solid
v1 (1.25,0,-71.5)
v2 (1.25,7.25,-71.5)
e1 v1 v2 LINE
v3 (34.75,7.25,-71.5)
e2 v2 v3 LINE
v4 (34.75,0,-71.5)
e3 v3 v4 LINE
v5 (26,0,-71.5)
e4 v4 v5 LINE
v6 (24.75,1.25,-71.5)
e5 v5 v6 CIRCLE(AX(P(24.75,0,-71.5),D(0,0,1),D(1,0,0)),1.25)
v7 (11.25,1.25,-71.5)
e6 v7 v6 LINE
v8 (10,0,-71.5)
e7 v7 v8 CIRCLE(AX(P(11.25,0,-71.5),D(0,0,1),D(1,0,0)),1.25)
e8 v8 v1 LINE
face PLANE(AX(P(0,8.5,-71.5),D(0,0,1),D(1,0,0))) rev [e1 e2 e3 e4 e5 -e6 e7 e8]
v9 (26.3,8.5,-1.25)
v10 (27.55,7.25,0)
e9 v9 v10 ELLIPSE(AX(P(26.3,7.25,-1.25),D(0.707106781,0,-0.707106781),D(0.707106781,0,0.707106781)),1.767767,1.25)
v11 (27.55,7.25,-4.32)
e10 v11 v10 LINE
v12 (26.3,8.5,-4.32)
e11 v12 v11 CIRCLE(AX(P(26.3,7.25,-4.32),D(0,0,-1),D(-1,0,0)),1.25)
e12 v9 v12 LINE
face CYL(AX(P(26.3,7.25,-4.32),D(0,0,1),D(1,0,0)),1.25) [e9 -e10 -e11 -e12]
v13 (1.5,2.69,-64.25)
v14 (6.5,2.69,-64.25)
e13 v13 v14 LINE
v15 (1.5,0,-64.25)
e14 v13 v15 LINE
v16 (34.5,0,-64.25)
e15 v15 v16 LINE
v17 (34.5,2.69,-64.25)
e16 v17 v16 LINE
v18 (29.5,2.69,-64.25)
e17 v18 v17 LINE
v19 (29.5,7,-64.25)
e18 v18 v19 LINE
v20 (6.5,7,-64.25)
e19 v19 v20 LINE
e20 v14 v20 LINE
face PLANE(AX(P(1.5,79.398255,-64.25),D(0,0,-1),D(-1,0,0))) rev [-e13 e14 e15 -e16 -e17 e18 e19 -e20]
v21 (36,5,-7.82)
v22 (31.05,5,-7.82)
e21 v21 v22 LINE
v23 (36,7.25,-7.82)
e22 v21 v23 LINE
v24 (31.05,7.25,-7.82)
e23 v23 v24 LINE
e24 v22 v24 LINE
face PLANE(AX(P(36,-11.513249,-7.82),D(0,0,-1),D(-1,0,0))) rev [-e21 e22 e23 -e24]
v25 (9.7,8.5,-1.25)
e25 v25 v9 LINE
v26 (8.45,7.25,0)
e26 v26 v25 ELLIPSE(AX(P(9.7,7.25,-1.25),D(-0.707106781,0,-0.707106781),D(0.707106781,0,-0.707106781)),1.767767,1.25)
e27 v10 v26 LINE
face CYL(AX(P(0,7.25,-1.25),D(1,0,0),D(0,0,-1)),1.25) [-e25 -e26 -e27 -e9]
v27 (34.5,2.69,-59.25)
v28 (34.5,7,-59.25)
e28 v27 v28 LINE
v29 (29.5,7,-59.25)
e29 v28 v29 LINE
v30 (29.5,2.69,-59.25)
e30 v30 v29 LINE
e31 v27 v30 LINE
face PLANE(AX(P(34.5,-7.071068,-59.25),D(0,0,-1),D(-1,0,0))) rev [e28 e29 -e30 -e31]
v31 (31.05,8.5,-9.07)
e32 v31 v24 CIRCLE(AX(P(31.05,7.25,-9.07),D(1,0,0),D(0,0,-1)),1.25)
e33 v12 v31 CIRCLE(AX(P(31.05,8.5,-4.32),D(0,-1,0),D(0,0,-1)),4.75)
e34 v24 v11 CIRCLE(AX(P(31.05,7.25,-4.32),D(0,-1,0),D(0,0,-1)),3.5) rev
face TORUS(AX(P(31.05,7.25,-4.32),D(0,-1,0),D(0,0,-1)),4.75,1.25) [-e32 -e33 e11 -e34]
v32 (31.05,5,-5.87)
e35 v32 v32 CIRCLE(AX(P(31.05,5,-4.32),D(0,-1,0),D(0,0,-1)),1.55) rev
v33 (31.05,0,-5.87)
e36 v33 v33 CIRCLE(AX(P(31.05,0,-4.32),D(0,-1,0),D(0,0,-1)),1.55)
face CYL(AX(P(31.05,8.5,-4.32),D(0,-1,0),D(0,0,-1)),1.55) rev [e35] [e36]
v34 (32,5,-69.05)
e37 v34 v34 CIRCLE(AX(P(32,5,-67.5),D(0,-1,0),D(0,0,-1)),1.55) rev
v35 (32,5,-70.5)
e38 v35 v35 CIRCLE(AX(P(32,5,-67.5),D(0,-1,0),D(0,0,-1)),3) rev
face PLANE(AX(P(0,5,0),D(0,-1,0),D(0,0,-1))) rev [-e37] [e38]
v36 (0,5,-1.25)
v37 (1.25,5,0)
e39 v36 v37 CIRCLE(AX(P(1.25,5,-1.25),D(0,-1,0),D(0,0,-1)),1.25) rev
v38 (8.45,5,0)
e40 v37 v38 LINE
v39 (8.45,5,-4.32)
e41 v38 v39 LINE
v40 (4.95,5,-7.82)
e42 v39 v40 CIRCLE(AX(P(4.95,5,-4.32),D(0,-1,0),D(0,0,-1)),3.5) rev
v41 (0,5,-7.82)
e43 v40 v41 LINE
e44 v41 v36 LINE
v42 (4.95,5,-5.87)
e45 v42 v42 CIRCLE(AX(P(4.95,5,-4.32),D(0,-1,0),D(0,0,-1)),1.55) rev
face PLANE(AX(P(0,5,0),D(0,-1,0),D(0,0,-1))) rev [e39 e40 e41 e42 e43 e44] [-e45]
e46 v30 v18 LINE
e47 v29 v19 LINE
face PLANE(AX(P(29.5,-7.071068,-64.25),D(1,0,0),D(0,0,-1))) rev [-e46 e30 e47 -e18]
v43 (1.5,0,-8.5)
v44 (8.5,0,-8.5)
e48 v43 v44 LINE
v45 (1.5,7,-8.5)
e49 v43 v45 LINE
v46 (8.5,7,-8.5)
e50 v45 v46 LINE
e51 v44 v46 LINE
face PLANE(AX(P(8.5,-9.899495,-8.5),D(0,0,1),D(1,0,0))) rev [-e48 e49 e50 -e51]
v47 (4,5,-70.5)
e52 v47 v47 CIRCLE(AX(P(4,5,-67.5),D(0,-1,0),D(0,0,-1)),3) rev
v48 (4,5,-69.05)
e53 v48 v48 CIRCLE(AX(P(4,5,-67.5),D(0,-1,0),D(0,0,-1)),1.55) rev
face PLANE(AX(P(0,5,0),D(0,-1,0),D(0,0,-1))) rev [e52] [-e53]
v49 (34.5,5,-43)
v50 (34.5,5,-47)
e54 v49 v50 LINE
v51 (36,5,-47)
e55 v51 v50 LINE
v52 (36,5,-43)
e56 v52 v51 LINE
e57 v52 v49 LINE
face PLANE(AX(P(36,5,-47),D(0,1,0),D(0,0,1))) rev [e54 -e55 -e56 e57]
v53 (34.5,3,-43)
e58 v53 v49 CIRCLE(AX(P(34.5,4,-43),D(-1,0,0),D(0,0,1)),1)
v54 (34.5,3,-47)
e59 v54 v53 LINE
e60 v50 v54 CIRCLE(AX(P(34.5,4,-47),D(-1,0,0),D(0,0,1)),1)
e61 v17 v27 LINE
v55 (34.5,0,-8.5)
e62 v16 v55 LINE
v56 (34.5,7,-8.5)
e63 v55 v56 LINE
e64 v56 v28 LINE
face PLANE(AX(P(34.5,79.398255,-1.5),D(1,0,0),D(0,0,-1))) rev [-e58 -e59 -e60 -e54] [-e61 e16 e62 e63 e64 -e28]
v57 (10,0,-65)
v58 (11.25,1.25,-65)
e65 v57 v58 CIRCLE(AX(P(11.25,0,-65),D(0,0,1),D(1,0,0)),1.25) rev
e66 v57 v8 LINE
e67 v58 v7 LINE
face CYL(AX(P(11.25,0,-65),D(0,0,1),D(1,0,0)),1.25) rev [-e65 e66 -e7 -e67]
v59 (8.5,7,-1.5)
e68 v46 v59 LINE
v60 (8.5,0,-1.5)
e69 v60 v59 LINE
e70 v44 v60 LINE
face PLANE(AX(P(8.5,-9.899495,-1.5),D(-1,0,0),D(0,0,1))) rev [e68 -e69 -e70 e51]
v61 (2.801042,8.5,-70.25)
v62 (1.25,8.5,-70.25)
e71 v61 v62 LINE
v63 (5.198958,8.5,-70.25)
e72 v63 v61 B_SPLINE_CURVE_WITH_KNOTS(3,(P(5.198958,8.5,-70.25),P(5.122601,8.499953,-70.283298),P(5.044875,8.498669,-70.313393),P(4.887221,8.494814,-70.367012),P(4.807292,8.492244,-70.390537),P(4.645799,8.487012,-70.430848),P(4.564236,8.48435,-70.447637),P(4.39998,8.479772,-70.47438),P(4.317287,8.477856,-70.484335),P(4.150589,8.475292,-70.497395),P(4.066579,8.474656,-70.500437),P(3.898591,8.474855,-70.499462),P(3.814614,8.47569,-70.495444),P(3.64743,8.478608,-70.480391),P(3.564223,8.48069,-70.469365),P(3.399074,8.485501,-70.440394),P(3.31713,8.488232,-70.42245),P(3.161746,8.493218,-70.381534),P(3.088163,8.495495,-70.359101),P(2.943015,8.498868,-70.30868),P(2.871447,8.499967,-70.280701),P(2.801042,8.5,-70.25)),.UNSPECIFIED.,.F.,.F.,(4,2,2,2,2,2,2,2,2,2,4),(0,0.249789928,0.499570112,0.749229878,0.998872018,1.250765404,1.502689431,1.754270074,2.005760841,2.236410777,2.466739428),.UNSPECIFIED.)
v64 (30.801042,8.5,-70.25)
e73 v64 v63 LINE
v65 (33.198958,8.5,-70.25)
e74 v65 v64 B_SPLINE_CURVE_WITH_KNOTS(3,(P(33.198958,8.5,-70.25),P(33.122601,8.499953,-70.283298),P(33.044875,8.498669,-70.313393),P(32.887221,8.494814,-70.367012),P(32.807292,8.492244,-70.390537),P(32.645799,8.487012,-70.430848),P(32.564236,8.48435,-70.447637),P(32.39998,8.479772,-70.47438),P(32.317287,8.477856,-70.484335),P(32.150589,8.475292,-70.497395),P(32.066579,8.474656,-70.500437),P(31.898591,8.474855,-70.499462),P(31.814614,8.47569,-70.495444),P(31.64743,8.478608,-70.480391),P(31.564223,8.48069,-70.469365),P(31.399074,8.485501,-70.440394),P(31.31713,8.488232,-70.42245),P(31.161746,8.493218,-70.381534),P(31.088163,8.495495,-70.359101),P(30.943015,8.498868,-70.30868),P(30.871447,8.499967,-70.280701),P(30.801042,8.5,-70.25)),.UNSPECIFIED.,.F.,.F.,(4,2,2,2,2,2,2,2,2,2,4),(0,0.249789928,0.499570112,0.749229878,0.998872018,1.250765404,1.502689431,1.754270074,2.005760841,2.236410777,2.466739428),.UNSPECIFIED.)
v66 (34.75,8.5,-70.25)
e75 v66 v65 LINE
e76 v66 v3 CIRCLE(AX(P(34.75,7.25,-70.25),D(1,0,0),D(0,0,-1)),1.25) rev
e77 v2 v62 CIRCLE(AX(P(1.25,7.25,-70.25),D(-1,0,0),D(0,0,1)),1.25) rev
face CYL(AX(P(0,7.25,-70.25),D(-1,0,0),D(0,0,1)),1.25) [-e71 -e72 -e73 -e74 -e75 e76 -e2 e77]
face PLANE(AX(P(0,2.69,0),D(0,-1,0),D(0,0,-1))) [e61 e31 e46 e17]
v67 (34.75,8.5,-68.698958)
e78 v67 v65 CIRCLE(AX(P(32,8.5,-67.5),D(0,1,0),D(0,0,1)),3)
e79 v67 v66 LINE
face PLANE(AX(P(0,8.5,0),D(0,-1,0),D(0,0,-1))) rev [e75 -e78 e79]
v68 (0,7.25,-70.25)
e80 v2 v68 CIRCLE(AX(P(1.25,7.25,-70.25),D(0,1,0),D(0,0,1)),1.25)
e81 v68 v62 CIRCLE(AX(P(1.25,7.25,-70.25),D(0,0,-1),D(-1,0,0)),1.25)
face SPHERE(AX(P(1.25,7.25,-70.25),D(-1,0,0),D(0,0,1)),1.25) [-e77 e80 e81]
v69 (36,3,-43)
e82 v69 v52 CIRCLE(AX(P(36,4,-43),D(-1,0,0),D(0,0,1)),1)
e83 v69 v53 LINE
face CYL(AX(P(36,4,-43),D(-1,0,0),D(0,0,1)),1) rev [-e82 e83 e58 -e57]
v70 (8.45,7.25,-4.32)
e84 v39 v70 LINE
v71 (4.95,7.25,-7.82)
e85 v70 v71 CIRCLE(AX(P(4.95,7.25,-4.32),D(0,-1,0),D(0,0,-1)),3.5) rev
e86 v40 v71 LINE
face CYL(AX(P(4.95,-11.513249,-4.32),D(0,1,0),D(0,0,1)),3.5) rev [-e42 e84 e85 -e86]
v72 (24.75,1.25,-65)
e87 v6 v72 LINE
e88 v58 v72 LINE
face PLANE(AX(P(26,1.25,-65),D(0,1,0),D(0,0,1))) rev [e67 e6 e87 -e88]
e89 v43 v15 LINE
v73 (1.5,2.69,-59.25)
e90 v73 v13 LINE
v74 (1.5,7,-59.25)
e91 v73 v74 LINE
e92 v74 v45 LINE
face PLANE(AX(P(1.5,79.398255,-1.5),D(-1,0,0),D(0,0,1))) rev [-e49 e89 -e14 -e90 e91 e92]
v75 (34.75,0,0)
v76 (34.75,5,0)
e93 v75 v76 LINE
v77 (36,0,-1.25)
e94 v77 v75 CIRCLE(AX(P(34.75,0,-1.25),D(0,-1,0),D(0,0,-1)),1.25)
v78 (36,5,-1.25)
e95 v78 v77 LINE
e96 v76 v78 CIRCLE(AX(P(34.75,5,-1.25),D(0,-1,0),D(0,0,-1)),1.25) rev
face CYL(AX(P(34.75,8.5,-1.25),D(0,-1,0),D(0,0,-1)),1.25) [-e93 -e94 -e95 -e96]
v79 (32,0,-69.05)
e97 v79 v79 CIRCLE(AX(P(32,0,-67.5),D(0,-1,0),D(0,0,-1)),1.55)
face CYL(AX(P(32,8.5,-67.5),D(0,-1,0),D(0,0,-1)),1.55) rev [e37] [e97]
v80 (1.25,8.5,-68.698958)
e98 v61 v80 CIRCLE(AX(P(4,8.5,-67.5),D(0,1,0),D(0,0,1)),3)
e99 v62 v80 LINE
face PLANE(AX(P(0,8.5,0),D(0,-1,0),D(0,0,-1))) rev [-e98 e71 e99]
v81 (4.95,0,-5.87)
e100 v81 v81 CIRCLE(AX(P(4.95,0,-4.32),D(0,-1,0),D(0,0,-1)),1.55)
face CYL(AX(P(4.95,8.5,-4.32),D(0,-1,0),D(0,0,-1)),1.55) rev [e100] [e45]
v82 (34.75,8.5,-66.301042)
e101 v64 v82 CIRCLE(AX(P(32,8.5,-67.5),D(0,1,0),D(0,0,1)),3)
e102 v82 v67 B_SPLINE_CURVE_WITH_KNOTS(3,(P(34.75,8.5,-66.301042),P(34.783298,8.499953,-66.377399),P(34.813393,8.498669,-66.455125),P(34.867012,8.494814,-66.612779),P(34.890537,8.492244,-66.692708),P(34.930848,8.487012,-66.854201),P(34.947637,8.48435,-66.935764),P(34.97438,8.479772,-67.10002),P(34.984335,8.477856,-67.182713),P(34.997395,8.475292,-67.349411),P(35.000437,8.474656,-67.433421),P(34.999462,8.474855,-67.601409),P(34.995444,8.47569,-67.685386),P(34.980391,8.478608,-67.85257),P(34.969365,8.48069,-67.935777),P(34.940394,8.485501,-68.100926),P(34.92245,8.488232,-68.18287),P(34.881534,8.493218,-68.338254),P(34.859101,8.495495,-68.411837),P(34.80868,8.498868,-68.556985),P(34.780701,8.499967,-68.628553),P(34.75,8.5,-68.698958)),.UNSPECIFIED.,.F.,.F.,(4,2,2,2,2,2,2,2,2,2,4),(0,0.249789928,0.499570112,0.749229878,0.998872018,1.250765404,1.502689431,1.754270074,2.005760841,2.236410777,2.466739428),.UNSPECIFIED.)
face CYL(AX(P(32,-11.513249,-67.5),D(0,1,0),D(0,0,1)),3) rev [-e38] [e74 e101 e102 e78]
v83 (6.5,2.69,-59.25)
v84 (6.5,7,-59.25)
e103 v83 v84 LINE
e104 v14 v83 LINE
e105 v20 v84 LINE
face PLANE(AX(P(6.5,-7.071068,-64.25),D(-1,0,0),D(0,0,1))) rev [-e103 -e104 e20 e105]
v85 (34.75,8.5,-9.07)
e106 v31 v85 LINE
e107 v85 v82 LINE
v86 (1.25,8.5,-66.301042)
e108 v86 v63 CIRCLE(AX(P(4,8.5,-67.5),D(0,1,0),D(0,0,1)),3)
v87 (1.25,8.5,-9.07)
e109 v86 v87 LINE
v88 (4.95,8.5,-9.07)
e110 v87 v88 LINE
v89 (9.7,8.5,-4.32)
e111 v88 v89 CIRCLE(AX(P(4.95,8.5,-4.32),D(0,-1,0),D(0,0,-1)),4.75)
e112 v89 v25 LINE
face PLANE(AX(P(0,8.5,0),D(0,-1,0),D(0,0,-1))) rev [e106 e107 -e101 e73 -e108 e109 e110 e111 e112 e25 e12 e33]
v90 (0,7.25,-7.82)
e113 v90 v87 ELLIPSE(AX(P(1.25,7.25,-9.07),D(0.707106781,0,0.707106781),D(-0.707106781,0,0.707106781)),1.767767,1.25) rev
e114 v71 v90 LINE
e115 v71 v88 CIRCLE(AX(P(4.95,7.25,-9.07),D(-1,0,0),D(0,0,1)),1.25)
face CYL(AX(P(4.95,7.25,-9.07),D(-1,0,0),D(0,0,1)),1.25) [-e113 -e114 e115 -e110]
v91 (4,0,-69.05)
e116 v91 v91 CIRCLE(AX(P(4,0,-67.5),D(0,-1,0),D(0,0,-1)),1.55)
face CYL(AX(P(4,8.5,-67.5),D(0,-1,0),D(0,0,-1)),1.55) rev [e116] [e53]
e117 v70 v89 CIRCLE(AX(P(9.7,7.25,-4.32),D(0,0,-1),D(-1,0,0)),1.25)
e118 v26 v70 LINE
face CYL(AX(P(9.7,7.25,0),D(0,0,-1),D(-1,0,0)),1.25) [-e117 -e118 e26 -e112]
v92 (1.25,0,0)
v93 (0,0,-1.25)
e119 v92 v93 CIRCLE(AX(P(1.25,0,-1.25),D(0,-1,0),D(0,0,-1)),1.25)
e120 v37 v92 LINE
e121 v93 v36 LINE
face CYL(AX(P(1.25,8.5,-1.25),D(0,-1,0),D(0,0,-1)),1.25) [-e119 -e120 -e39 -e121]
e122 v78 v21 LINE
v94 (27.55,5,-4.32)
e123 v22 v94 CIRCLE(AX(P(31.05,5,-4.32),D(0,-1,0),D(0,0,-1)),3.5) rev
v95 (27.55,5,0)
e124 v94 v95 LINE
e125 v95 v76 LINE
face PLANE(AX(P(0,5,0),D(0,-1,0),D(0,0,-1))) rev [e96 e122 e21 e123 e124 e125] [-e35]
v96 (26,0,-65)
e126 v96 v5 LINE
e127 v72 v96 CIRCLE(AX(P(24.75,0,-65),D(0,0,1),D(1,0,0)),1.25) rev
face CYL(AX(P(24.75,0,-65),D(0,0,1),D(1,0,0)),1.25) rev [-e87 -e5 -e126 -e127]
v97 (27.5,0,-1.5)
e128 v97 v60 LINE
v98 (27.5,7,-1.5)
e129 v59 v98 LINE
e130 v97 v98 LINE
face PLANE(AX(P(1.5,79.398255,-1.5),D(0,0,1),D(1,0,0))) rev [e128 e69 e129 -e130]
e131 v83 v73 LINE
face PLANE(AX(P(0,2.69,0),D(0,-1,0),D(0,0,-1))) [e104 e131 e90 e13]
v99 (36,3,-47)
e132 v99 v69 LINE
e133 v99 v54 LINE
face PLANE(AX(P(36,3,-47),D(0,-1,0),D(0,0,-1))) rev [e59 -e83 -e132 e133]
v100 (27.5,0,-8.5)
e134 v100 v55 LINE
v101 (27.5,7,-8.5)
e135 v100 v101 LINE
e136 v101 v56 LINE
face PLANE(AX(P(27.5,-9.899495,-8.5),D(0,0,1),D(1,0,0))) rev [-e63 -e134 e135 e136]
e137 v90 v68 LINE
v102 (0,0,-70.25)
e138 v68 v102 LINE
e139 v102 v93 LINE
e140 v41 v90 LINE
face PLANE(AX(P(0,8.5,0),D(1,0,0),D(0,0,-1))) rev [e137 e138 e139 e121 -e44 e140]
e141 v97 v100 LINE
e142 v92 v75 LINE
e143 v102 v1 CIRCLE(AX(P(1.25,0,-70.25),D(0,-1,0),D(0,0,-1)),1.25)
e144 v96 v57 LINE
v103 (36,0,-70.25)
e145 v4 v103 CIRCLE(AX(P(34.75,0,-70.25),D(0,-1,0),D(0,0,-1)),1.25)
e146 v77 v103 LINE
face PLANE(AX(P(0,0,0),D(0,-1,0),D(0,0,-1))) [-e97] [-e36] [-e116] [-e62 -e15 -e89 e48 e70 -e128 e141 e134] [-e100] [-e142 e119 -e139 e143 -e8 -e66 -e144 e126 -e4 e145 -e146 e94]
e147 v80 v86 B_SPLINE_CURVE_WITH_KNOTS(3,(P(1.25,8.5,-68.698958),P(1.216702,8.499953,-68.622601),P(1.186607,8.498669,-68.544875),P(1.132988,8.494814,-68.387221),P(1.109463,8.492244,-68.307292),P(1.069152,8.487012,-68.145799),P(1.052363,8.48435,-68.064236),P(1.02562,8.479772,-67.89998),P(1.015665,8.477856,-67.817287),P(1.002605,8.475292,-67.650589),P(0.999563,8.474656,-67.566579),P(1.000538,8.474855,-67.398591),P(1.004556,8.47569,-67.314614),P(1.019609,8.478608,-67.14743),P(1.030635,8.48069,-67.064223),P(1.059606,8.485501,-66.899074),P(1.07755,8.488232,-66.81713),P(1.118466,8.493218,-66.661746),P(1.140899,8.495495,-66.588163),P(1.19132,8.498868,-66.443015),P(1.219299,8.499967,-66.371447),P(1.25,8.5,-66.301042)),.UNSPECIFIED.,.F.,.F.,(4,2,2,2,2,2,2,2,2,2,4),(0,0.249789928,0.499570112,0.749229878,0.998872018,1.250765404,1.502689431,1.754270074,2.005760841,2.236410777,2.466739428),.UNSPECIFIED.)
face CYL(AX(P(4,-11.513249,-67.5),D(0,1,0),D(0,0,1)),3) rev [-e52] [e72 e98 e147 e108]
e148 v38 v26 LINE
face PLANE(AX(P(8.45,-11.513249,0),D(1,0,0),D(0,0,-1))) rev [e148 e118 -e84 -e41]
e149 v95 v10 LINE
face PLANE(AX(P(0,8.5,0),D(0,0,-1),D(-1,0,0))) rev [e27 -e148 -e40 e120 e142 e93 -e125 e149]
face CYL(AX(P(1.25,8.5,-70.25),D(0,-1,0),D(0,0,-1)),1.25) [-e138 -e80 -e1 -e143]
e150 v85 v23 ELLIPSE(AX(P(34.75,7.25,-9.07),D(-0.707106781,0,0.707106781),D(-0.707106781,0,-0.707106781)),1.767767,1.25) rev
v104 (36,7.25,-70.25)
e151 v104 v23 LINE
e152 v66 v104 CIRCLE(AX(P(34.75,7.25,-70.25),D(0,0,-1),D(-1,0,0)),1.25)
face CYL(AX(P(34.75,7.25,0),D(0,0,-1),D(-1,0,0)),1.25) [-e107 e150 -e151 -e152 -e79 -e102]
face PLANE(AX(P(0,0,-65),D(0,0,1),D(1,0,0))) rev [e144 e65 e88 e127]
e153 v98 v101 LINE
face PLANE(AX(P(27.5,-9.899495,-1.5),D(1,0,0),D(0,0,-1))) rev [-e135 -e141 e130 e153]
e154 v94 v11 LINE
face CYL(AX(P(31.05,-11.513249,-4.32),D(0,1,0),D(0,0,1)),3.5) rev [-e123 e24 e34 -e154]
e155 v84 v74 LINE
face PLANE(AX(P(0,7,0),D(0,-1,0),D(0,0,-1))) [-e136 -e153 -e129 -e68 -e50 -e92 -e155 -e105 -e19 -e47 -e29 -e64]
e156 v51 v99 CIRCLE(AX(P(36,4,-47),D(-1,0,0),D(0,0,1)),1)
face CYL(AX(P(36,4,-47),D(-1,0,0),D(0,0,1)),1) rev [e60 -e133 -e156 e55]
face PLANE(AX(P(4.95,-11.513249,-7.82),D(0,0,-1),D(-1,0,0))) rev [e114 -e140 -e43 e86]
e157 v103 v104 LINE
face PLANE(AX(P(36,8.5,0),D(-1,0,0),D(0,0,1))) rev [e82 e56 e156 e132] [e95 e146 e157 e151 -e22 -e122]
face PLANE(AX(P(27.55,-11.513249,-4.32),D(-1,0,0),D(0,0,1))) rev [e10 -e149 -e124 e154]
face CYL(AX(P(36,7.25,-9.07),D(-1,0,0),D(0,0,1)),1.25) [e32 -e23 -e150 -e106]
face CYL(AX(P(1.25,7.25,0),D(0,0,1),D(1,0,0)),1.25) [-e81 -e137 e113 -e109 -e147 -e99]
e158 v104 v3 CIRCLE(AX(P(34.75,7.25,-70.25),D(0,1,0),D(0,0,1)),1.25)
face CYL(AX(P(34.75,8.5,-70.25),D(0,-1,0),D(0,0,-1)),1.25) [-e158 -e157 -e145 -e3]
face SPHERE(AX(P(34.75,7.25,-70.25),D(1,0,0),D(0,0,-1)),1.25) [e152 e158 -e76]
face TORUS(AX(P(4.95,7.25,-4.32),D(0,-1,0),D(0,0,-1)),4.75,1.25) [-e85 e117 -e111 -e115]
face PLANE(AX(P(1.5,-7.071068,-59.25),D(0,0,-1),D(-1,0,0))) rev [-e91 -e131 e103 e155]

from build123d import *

# Parameters (mm, degrees)
SKETCH1_W           = 36
SKETCH1_H           = 71.5
BOSS_EXTRUDE1_DEPTH = 8.5
SKETCH2_W           = 33
SKETCH2_H           = 62.75
CUT_EXTRUDE1_DEPTH  = 7
SKETCH4_W           = 16
SKETCH4_H           = 1.25
CUT_EXTRUDE2_DEPTH  = 6.5
FILLET1_R           = 1.25
SKETCH7_W           = 7
SKETCH7_H           = 7
BOSS_EXTRUDE4_DEPTH = 7
SKETCH8_R           = 1.55
CUT_EXTRUDE3_DEPTH  = 81.50155278
SKETCH9_R           = 3
CUT_EXTRUDE4_DEPTH  = 3.5
CUT_EXTRUDE5_DEPTH  = 80.842031537
SKETCH11_W          = 5
SKETCH11_H          = 5
BOSS_EXTRUDE8_DEPTH = 4.31
FILLET2_R           = 1.25


# Some blends are built 0.0001 mm under size
with BuildPart() as part:
    # Sketch1 → Boss-Extrude1 (new body)
    with BuildSketch(Plane(origin=(0, 0, 0), x_dir=(1, 0, 0), z_dir=(0, 1, 0))):
        with Locations((18, 35.75)):
            Rectangle(SKETCH1_W, SKETCH1_H)
    extrude(amount=BOSS_EXTRUDE1_DEPTH)

    # Sketch2 → Cut-Extrude1 (cut)
    with BuildSketch(Plane.XZ):
        with Locations((18, -32.875)):
            Rectangle(SKETCH2_W, SKETCH2_H)
    extrude(amount=-CUT_EXTRUDE1_DEPTH, mode=Mode.SUBTRACT)

    # Sketch4 → Cut-Extrude2 (cut)
    with BuildSketch(Plane(origin=(0, 0, -71.5), x_dir=(-1, 0, 0), z_dir=(0, 0, -1))):
        with Locations((-18, 0.625)):
            Rectangle(SKETCH4_W, SKETCH4_H)
    extrude(amount=-CUT_EXTRUDE2_DEPTH, mode=Mode.SUBTRACT)

    # Fillet1
    fillet1_edges = [part.edges().sort_by_distance(p)[0] for p in [
        (26, 1.25, -68.25),
        (10, 1.25, -68.25),
    ]]
    fillet(fillet1_edges, radius=FILLET1_R - 0.0001)  # a hair under: the kernel refuses the full size

    # Sketch7 → Boss-Extrude4 (add)
    with BuildSketch(Plane.XZ.offset(-7)):
        with Locations((31, -5)):
            Rectangle(SKETCH7_W, SKETCH7_H)
        with Locations((5, -5)):
            Rectangle(SKETCH7_W, SKETCH7_H)
    extrude(amount=BOSS_EXTRUDE4_DEPTH)

    # Sketch8 → Cut-Extrude3 (cut, through all)
    with BuildSketch(Plane(origin=(0, 0, 0), x_dir=(-1, 0, 0), z_dir=(0, -1, 0))):
        with Locations(Location((-31.05, 4.32, 0), (0, 0, 90))):
            Circle(SKETCH8_R)
        with Locations(Location((-32, 67.5, 0), (0, 0, 90))):
            Circle(SKETCH8_R)
        with Locations(Location((-4, 67.5, 0), (0, 0, 90))):
            Circle(SKETCH8_R)
        with Locations(Location((-4.95, 4.32, 0), (0, 0, 90))):
            Circle(SKETCH8_R)
    extrude(amount=-CUT_EXTRUDE3_DEPTH, mode=Mode.SUBTRACT)

    # Sketch9 → Cut-Extrude4 (cut)
    with BuildSketch(Plane(origin=(0, 8.5, 0), x_dir=(1, 0, 0), z_dir=(0, 1, 0))):
        with Locations(Location((4, 67.5, 0), (0, 0, 270))):
            Circle(SKETCH9_R)
        with Locations(Location((32, 67.5, 0), (0, 0, 270))):
            Circle(SKETCH9_R)
        with BuildLine():
            Line((4.95, 7.82), (0, 7.82))
            Line((0, 7.82), (0, 0))
            Line((0, 0), (8.45, 0))
            Line((8.45, 0), (8.45, 4.32))
            ThreePointArc((8.45, 4.32), (7.424873734, 6.794873734), (4.95, 7.82))
        make_face()
        with BuildLine():
            Line((27.55, 4.32), (27.55, 0))
            Line((27.55, 0), (36, 0))
            Line((36, 0), (36, 7.82))
            Line((36, 7.82), (31.05, 7.82))
            ThreePointArc((31.05, 7.82), (28.575126266, 6.794873734), (27.55, 4.32))
        make_face()
    extrude(amount=-CUT_EXTRUDE4_DEPTH, mode=Mode.SUBTRACT)

    # Sketch10 → Cut-Extrude5 (cut, through all)
    with BuildSketch(Plane.ZY.offset(-34.5)):
        with BuildLine():
            Line((-47, 5), (-43, 5))
            ThreePointArc((-43, 5), (-42, 4), (-43, 3))
            Line((-43, 3), (-47, 3))
            ThreePointArc((-47, 3), (-48, 4), (-47, 5))
        make_face()
    extrude(amount=-CUT_EXTRUDE5_DEPTH, mode=Mode.SUBTRACT)

    # Sketch11 → Boss-Extrude8 (add)
    with BuildSketch(Plane.XZ.offset(-7)):
        with Locations((4, -61.75)):
            Rectangle(SKETCH11_W, SKETCH11_H)
        with Locations((32, -61.75)):
            Rectangle(SKETCH11_W, SKETCH11_H)
    extrude(amount=BOSS_EXTRUDE8_DEPTH)

    # Fillet2
    # the kernel refuses this fillet: 1.25 mm, written as the material it takes off along each edge
    with BuildSketch(Plane(origin=(34.75, 7.25, -70.25), x_dir=(1, 0, 0), z_dir=(0, 0, -1))) as fillet2_piece_1_section:
        Polygon((0, 0), (FILLET2_R, 0), (FILLET2_R, -FILLET2_R), (0, -FILLET2_R), align=None)
    fillet2_piece_1 = extrude(amount=FILLET2_R, mode=Mode.PRIVATE)
    fillet2_piece_1 = fillet2_piece_1 - Plane(origin=(34.75, 7.25, -70.25), x_dir=(-0.7071067811865475, -0.7071067811865475, 0), z_dir=(0, 0, -1)) * Sphere(FILLET2_R, mode=Mode.PRIVATE)
    add(fillet2_piece_1, mode=Mode.SUBTRACT)
    with BuildSketch(Plane(origin=(1.25, 7.25, -70.25), x_dir=(-1, 0, 0), z_dir=(0, 0, -1))) as fillet2_piece_2_section:
        Polygon((0, 0), (FILLET2_R, 0), (FILLET2_R, FILLET2_R), (0, FILLET2_R), align=None)
    fillet2_piece_2 = extrude(amount=FILLET2_R, mode=Mode.PRIVATE)
    fillet2_piece_2 = fillet2_piece_2 - Plane(origin=(1.25, 7.25, -70.25), x_dir=(0.7071067811865475, -0.7071067811865475, 0), z_dir=(0, 0, -1)) * Sphere(FILLET2_R, mode=Mode.PRIVATE)
    add(fillet2_piece_2, mode=Mode.SUBTRACT)
    with BuildSketch(Plane(origin=(5.325, 8.5, 0), x_dir=(0, 0, -1), z_dir=(1, 0, 0))) as fillet2_piece_3:
        with BuildLine():
            CenterArc((FILLET2_R, -FILLET2_R), FILLET2_R, 90, 90)
            Line((0, -FILLET2_R), (0, 0))
            Line((0, 0), (FILLET2_R, 0))
        make_face()
    extrude(amount=25.35, mode=Mode.SUBTRACT)
    with BuildSketch(Plane(origin=(36, 8.5, -4.695), x_dir=(0, -1, 0), z_dir=(0, 0, -1))) as fillet2_piece_4:
        with BuildLine():
            CenterArc((FILLET2_R, FILLET2_R), FILLET2_R, 180, 90)
            Line((0, FILLET2_R), (0, 0))
            Line((0, 0), (FILLET2_R, 0))
        make_face()
    extrude(amount=65.555, mode=Mode.SUBTRACT)
    with BuildSketch(Plane(origin=(36, -3.125, 0), x_dir=(0, 0, -1), z_dir=(0, 1, 0))) as fillet2_piece_5:
        with BuildLine():
            CenterArc((FILLET2_R, FILLET2_R), FILLET2_R, 180, 90)
            Line((0, FILLET2_R), (0, 0))
            Line((0, 0), (FILLET2_R, 0))
        make_face()
    extrude(amount=11.25, mode=Mode.SUBTRACT)
    with BuildSketch(Plane(origin=(0, -3.125, 0), x_dir=(0, 0, -1), z_dir=(0, 1, 0))) as fillet2_piece_6:
        with BuildLine():
            CenterArc((FILLET2_R, -FILLET2_R), FILLET2_R, 90, 90)
            Line((0, -FILLET2_R), (0, 0))
            Line((0, 0), (FILLET2_R, 0))
        make_face()
    extrude(amount=11.25, mode=Mode.SUBTRACT)
    with BuildSketch(Plane(origin=(4.95, 8.5, -4.32), x_dir=(1, 0, 0), z_dir=(0, 0, 1))) as fillet2_piece_7:
        with BuildLine():
            CenterArc((3.5 + FILLET2_R, -FILLET2_R), FILLET2_R, 90, 90)
            Line((3.5, -FILLET2_R), (3.5, 0))
            Line((3.5, 0), (3.5 + FILLET2_R, 0))
        make_face()
    revolve(axis=Axis((4.95, 8.5, -4.32), (0, 1, 0)), revolution_arc=90, mode=Mode.SUBTRACT)
    with BuildSketch(Plane(origin=(4.95, 8.5, -7.82), x_dir=(0, 0, -1), z_dir=(-1, 0, 0)), Plane(origin=(39.125, 8.5, -7.82), x_dir=(0, 0, -1), z_dir=(-1, 0, 0))) as fillet2_piece_8:
        with BuildLine():
            CenterArc((FILLET2_R, FILLET2_R), FILLET2_R, 180, 90)
            Line((0, FILLET2_R), (0, 0))
            Line((0, 0), (FILLET2_R, 0))
        make_face()
    extrude(amount=8.075, mode=Mode.SUBTRACT)
    with BuildSketch(Plane(origin=(8.45, 8.5, 3.125), x_dir=(1, 0, 0), z_dir=(0, 0, -1)), Plane(origin=(27.55, 8.5, -4.32), x_dir=(-1, 0, 0), z_dir=(0, 0, 1))) as fillet2_piece_9:
        with BuildLine():
            CenterArc((FILLET2_R, FILLET2_R), FILLET2_R, 180, 90)
            Line((0, FILLET2_R), (0, 0))
            Line((0, 0), (FILLET2_R, 0))
        make_face()
    extrude(amount=7.445, mode=Mode.SUBTRACT)
    with BuildSketch(Plane(origin=(31.05, 8.5, -4.32), x_dir=(0, 0, -1), z_dir=(1, 0, 0))) as fillet2_piece_10:
        with BuildLine():
            CenterArc((3.5 + FILLET2_R, -FILLET2_R), FILLET2_R, 90, 90)
            Line((3.5, -FILLET2_R), (3.5, 0))
            Line((3.5, 0), (3.5 + FILLET2_R, 0))
        make_face()
    revolve(axis=Axis((31.05, 8.5, -4.32), (0, 1, 0)), revolution_arc=90, mode=Mode.SUBTRACT)
    with BuildSketch(Plane(origin=(34.75, 8.5, -71.5), x_dir=(0, -1, 0), z_dir=(-1, 0, 0))) as fillet2_piece_11:
        with BuildLine():
            CenterArc((FILLET2_R, FILLET2_R), FILLET2_R, 180, 90)
            Line((0, FILLET2_R), (0, 0))
            Line((0, 0), (FILLET2_R, 0))
        make_face()
    extrude(amount=33.5, mode=Mode.SUBTRACT)
    with BuildSketch(Plane(origin=(0, 8.5, -70.25), x_dir=(1, 0, 0), z_dir=(0, 0, 1))) as fillet2_piece_12:
        with BuildLine():
            CenterArc((FILLET2_R, -FILLET2_R), FILLET2_R, 90, 90)
            Line((0, -FILLET2_R), (0, 0))
            Line((0, 0), (FILLET2_R, 0))
        make_face()
    extrude(amount=65.555, mode=Mode.SUBTRACT)
    with BuildSketch(Plane(origin=(0, -3.125, -71.5), x_dir=(1, 0, 0), z_dir=(0, 1, 0))) as fillet2_piece_13:
        with BuildLine():
            CenterArc((FILLET2_R, -FILLET2_R), FILLET2_R, 90, 90)
            Line((0, -FILLET2_R), (0, 0))
            Line((0, 0), (FILLET2_R, 0))
        make_face()
    extrude(amount=10.375, mode=Mode.SUBTRACT)
    with BuildSketch(Plane(origin=(36, -3.125, -71.5), x_dir=(-1, 0, 0), z_dir=(0, 1, 0))) as fillet2_piece_14:
        with BuildLine():
            CenterArc((FILLET2_R, FILLET2_R), FILLET2_R, 180, 90)
            Line((0, FILLET2_R), (0, 0))
            Line((0, 0), (FILLET2_R, 0))
        make_face()
    extrude(amount=10.375, mode=Mode.SUBTRACT)


solid = part.part
